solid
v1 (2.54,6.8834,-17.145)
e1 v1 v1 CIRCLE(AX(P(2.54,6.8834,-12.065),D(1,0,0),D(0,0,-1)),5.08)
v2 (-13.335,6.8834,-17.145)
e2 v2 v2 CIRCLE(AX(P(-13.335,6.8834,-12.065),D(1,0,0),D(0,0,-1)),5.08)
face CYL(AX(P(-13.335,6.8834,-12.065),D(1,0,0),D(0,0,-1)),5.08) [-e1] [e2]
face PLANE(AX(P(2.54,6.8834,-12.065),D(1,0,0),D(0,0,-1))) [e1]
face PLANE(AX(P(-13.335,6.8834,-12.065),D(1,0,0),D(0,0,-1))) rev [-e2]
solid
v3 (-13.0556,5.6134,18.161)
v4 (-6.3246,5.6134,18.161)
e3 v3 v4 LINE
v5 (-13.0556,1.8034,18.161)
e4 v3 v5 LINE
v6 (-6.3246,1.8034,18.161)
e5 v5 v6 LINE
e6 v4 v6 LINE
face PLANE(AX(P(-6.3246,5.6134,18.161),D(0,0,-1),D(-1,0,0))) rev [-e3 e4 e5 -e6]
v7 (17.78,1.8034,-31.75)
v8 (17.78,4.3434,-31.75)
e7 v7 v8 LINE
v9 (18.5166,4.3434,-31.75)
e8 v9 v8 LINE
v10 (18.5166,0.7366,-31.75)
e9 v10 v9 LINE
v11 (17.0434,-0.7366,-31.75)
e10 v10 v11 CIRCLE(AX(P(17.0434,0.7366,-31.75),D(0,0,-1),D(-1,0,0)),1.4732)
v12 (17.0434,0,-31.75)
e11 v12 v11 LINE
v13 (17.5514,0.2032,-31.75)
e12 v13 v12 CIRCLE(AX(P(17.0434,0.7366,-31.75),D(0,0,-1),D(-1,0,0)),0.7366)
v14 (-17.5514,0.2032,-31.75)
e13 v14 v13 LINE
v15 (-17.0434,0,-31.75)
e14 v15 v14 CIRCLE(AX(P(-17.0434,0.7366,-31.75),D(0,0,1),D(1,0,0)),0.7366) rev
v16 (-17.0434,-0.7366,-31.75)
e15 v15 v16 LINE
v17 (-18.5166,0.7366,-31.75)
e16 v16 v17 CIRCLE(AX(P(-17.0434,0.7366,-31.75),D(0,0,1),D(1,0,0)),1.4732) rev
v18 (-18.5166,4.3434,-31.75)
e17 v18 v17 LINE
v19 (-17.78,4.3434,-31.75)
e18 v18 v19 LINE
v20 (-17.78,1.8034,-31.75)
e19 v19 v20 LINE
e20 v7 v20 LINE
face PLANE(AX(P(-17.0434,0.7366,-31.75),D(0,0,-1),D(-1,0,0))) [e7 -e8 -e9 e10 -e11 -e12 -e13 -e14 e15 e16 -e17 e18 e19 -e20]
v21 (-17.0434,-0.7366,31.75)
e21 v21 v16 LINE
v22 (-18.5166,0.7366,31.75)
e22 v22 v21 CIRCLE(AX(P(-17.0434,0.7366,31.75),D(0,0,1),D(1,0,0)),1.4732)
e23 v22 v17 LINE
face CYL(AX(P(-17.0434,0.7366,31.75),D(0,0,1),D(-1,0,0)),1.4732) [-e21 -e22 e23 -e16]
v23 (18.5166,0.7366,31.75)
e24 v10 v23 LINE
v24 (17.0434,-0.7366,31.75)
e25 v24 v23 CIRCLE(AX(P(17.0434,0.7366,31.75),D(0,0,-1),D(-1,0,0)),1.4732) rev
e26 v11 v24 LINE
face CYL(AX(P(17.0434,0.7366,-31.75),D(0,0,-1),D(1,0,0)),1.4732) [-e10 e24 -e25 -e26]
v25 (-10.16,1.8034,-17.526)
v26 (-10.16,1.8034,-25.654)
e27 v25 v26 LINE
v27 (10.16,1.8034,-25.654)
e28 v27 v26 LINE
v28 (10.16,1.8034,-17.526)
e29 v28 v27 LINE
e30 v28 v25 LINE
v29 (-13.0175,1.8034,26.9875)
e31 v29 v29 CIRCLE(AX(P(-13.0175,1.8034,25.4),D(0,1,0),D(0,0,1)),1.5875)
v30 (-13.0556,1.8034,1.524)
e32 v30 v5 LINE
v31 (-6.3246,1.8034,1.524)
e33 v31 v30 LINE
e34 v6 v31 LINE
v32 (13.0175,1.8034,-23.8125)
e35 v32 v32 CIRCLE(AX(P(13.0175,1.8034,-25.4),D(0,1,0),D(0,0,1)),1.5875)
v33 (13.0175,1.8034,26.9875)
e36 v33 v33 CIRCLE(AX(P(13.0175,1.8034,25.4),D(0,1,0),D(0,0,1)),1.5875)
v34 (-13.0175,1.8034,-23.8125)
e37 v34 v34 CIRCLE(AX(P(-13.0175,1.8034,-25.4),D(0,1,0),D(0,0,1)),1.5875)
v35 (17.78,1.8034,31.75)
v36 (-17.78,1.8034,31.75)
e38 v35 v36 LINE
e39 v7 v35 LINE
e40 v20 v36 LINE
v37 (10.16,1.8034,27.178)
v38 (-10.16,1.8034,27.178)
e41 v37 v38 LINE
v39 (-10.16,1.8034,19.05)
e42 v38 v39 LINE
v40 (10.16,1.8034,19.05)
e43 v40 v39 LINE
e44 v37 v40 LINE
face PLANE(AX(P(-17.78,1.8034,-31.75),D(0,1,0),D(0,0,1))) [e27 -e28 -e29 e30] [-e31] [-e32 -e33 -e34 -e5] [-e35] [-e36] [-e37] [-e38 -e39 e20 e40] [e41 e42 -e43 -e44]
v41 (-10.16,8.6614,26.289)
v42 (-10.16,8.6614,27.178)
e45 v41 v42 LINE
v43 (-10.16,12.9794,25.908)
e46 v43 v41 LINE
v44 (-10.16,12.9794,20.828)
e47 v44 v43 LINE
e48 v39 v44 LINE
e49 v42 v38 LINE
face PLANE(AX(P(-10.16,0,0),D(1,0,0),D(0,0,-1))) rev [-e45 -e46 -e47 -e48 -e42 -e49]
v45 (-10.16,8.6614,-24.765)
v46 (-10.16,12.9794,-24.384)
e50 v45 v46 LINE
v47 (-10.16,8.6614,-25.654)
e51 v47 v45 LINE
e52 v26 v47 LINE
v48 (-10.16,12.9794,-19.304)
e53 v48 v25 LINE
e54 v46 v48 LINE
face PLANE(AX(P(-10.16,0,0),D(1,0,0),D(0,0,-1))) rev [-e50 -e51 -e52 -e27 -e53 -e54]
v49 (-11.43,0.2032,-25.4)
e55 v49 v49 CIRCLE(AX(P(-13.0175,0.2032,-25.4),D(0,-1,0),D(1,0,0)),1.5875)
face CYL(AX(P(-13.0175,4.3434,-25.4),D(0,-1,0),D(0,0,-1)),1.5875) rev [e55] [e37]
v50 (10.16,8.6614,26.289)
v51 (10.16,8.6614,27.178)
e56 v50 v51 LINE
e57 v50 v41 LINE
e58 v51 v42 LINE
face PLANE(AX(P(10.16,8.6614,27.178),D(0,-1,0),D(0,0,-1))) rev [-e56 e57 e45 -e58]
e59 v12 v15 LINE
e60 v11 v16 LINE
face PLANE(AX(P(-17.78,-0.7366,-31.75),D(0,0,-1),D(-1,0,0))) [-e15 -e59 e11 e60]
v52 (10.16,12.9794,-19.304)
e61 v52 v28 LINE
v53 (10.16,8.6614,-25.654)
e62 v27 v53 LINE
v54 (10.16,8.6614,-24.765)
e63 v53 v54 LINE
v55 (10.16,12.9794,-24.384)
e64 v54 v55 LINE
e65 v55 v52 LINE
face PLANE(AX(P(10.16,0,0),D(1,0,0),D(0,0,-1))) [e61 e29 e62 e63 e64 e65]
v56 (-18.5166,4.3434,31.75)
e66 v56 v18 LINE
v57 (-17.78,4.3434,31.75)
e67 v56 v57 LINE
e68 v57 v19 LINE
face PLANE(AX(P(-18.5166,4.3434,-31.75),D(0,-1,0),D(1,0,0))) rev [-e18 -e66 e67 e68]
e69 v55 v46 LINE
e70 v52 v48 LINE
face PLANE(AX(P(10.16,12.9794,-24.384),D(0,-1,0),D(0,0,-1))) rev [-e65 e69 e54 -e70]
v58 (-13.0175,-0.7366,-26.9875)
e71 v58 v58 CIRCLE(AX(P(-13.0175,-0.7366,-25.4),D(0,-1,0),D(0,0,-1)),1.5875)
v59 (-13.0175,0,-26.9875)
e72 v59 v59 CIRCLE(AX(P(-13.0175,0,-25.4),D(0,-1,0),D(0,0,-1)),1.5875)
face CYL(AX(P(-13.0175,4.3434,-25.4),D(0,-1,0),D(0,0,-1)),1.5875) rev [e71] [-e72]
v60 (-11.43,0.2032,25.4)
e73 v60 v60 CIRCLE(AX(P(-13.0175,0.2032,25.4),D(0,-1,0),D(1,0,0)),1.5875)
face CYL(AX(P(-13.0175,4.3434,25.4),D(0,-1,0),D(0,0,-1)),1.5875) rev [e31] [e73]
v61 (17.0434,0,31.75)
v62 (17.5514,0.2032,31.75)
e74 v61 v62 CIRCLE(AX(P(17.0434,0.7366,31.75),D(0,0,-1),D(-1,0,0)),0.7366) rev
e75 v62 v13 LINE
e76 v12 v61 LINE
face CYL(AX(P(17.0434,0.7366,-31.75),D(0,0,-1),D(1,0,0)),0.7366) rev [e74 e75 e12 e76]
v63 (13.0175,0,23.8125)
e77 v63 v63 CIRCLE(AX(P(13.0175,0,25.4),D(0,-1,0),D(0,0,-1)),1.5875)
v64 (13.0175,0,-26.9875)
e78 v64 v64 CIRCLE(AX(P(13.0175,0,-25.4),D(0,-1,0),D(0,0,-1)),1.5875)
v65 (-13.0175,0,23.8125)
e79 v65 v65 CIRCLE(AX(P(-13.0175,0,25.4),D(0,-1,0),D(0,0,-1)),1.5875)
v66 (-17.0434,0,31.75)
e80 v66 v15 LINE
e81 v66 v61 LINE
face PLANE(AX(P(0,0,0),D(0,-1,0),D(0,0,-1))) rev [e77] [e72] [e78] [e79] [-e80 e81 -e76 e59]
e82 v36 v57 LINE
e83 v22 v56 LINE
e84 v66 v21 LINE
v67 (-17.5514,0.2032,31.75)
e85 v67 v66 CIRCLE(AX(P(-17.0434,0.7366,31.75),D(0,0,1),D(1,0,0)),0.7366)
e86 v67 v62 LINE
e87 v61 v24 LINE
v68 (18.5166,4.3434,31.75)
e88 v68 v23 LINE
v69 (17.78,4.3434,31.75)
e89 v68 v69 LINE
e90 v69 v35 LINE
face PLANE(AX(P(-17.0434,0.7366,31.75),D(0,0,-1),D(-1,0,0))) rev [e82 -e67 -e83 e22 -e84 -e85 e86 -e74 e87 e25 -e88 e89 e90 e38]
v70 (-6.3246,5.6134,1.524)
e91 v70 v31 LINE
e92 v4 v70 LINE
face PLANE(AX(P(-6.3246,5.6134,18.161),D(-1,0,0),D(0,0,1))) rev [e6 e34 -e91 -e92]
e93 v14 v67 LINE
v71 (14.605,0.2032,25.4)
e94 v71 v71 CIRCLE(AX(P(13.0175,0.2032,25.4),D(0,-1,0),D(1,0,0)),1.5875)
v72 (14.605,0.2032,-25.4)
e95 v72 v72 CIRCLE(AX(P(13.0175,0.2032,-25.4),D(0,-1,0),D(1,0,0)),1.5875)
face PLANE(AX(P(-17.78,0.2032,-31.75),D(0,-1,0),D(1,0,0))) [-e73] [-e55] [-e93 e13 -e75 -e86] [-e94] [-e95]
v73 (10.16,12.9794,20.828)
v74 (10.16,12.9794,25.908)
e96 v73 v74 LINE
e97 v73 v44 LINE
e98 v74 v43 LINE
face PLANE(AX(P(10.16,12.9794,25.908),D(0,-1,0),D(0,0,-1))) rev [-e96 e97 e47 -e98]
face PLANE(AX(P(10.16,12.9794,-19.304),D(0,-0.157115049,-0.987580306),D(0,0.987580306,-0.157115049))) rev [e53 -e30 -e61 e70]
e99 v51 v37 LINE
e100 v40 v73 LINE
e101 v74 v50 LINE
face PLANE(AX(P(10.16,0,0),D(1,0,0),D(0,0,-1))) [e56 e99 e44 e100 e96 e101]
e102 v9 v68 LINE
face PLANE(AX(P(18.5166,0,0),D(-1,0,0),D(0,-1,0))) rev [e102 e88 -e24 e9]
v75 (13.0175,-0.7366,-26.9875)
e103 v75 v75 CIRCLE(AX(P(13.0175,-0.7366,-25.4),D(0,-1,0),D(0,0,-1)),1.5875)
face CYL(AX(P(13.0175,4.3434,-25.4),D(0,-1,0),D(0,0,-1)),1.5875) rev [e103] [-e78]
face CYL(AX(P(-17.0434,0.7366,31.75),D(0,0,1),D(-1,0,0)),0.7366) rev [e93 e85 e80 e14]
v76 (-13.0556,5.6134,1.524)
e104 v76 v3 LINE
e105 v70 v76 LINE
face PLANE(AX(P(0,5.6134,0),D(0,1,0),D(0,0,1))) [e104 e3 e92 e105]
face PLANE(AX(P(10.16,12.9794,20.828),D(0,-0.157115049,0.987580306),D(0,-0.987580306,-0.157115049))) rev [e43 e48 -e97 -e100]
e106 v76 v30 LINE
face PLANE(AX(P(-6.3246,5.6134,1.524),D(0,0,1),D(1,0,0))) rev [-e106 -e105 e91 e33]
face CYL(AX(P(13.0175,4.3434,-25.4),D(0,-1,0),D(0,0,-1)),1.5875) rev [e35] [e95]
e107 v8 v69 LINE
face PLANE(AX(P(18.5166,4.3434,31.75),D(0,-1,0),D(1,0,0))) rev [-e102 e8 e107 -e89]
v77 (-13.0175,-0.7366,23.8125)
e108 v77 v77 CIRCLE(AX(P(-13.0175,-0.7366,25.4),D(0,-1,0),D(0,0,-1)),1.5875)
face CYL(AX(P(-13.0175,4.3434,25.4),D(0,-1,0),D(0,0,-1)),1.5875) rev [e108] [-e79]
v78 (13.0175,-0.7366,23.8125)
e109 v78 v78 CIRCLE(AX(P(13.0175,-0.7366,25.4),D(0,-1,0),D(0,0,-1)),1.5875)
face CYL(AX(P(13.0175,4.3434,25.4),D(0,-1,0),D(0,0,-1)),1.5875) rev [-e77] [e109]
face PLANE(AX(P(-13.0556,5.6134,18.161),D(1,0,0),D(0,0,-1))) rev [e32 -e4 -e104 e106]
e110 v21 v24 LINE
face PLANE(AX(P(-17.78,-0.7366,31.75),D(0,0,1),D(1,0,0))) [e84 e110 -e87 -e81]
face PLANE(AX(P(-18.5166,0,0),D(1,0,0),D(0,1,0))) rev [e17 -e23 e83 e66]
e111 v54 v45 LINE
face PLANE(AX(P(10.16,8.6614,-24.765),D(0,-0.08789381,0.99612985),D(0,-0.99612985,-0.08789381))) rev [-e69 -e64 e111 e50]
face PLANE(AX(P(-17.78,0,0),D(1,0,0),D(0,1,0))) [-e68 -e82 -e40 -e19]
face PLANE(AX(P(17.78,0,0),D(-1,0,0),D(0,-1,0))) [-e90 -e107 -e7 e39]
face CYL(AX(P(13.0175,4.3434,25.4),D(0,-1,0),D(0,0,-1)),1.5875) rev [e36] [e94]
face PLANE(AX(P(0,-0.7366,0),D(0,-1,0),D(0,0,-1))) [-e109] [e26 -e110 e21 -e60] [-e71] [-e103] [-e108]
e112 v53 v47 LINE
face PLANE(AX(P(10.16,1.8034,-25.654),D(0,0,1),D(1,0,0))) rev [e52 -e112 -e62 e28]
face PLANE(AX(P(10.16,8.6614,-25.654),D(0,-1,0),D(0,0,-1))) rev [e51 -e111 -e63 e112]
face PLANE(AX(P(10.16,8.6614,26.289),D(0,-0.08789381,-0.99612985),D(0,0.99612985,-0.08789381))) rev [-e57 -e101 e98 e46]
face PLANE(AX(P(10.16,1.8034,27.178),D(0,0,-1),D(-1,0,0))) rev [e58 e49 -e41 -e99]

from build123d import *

# Parameters (mm, degrees)
SKETCH1_W                      = 35.56
SKETCH1_H                      = 63.5
BASE_FLANGE1_DEPTH             = 0.7366
EDGE_FLANGE1_STRIP_W           = 4.4196
EDGE_FLANGE1_STRIP_H           = 0.7366
EDGE_FLANGE1_STRIP_CUT_DEPTH   = 63.5
EDGE_FLANGE1_STRIP_2_W         = 4.4196
EDGE_FLANGE1_STRIP_2_H         = 0.7366
EDGE_FLANGE1_STRIP_CUT_2_DEPTH = 63.5
EDGE_FLANGE1_DEPTH             = 63.5
EDGE_FLANGE1_BEND_DEPTH        = 63.5
SKETCH12_W                     = 35.56
SKETCH12_H                     = 1.6002
BOSS_EXTRUDE1_DEPTH            = 63.5
SKETCH13_R                     = 1.5875
CUT_EXTRUDE1_DEPTH             = 38.104357905
BOSS_EXTRUDE2_DEPTH            = 10.16
BOSS_EXTRUDE3_START            = 2.54
SKETCH15_R                     = 5.08
BOSS_EXTRUDE3_DEPTH            = 15.875
SKETCH16_W                     = 6.731
SKETCH16_H                     = 16.637
BOSS_EXTRUDE4_DEPTH            = 3.81


# Sheet-metal steps are written as plain solids
with BuildPart() as part:
    # Sketch1 → Base-Flange1 (new body)
    with BuildSketch(Plane(origin=(0, 0, 0), x_dir=(1, 0, 0), z_dir=(0, 1, 0))):
        Rectangle(SKETCH1_W, SKETCH1_H)
    extrude(amount=-BASE_FLANGE1_DEPTH)

    # Edge-Flange1 strip (across the edge) → Edge-Flange1 strip cut (cut)
    with BuildSketch(Plane(origin=(-17.78, 0, -31.75), x_dir=(1, 0, 0), z_dir=(0, 0, 1))):
        with Locations((-1.4732, -0.3683)):
            Rectangle(EDGE_FLANGE1_STRIP_W, EDGE_FLANGE1_STRIP_H)
    extrude(amount=EDGE_FLANGE1_STRIP_CUT_DEPTH, mode=Mode.SUBTRACT)

    # Edge-Flange1 strip 2 (across the edge) → Edge-Flange1 strip cut 2 (cut)
    with BuildSketch(Plane(origin=(17.78, 0, 31.75), x_dir=(-1, 0, 0), z_dir=(0, 0, -1))):
        with Locations((-1.4732, -0.3683)):
            Rectangle(EDGE_FLANGE1_STRIP_2_W, EDGE_FLANGE1_STRIP_2_H)
    extrude(amount=EDGE_FLANGE1_STRIP_CUT_2_DEPTH, mode=Mode.SUBTRACT)

    # Edge-Flange1 section (across the edge) → Edge-Flange1 (add)
    with BuildSketch(Plane(origin=(-17.78, 0, -31.75), x_dir=(1, 0, 0), z_dir=(0, 0, 1))):
        with BuildLine():
            Line((-0.7366, 0.7366), (-0.7366, 4.3434))
            Line((-0.7366, 4.3434), (0, 4.3434))
            Line((0, 4.3434), (0, 0.7366))
            ThreePointArc((0, 0.7366), (0.215745145, 0.215745145), (0.7366, 0))
            Line((0.7366, 0), (0.7366, -0.7366))
            ThreePointArc((0.7366, -0.7366), (-0.30510971, -0.30510971), (-0.7366, 0.7366))
        make_face()
    extrude(amount=EDGE_FLANGE1_DEPTH)

    # Edge-Flange1 section 2 (across the edge) → Edge-Flange1 bend (add)
    with BuildSketch(Plane(origin=(17.78, 0, 31.75), x_dir=(-1, 0, 0), z_dir=(0, 0, -1))):
        with BuildLine():
            Line((-0.7366, 0.7366), (-0.7366, 4.3434))
            Line((-0.7366, 4.3434), (0, 4.3434))
            Line((0, 4.3434), (0, 0.7366))
            ThreePointArc((0, 0.7366), (0.215745145, 0.215745145), (0.7366, 0))
            Line((0.7366, 0), (0.7366, -0.7366))
            ThreePointArc((0.7366, -0.7366), (-0.30510971, -0.30510971), (-0.7366, 0.7366))
        make_face()
    extrude(amount=EDGE_FLANGE1_BEND_DEPTH)

    # Sketch12 → Boss-Extrude1 (add, through all)
    with BuildSketch(Plane.XY.offset(31.75)):
        with Locations((0, 1.0033)):
            Rectangle(SKETCH12_W, SKETCH12_H)
    extrude(amount=-BOSS_EXTRUDE1_DEPTH)

    # Sketch13 → Cut-Extrude1 (cut, through all)
    with BuildSketch(Plane.XZ.offset(0.7366)):
        with Locations((-13.0175, 25.4)):
            Circle(SKETCH13_R)
        with Locations((13.0175, 25.4)):
            Circle(SKETCH13_R)
        with Locations((13.0175, -25.4)):
            Circle(SKETCH13_R)
        with Locations((-13.0175, -25.4)):
            Circle(SKETCH13_R)
    extrude(amount=-CUT_EXTRUDE1_DEPTH, mode=Mode.SUBTRACT)

    # Sketch14 → Boss-Extrude2 (add, symmetric)
    with BuildSketch(Plane(origin=(0, 0, 0), x_dir=(0, 0, -1), z_dir=(1, 0, 0))):
        Polygon((17.526, 1.8034), (25.654, 1.8034), (25.654, 8.6614), (24.765, 8.6614), (24.384, 12.9794), (19.304, 12.9794), align=None)
        Polygon((-20.828, 12.9794), (-19.05, 1.8034), (-27.178, 1.8034), (-27.178, 8.6614), (-26.289, 8.6614), (-25.908, 12.9794), align=None)
    extrude(amount=BOSS_EXTRUDE2_DEPTH, both=True)

    # Sketch16 → Boss-Extrude4 (add)
    with BuildSketch(Plane(origin=(0, 1.8034, 0), x_dir=(1, 0, 0), z_dir=(0, 1, 0))):
        with Locations((-9.6901, -9.8425)):
            Rectangle(SKETCH16_W, SKETCH16_H)
    extrude(amount=BOSS_EXTRUDE4_DEPTH)


with BuildPart() as body_2:
    # Sketch15 → Boss-Extrude3 (new body)
    with BuildSketch(Plane(origin=(0, 0, 0), x_dir=(0, 0, -1), z_dir=(1, 0, 0)).offset(BOSS_EXTRUDE3_START)):
        with Locations((12.065, 6.8834)):
            Circle(SKETCH15_R)
    extrude(amount=-BOSS_EXTRUDE3_DEPTH)


solid = Compound([part.part, body_2.part])
